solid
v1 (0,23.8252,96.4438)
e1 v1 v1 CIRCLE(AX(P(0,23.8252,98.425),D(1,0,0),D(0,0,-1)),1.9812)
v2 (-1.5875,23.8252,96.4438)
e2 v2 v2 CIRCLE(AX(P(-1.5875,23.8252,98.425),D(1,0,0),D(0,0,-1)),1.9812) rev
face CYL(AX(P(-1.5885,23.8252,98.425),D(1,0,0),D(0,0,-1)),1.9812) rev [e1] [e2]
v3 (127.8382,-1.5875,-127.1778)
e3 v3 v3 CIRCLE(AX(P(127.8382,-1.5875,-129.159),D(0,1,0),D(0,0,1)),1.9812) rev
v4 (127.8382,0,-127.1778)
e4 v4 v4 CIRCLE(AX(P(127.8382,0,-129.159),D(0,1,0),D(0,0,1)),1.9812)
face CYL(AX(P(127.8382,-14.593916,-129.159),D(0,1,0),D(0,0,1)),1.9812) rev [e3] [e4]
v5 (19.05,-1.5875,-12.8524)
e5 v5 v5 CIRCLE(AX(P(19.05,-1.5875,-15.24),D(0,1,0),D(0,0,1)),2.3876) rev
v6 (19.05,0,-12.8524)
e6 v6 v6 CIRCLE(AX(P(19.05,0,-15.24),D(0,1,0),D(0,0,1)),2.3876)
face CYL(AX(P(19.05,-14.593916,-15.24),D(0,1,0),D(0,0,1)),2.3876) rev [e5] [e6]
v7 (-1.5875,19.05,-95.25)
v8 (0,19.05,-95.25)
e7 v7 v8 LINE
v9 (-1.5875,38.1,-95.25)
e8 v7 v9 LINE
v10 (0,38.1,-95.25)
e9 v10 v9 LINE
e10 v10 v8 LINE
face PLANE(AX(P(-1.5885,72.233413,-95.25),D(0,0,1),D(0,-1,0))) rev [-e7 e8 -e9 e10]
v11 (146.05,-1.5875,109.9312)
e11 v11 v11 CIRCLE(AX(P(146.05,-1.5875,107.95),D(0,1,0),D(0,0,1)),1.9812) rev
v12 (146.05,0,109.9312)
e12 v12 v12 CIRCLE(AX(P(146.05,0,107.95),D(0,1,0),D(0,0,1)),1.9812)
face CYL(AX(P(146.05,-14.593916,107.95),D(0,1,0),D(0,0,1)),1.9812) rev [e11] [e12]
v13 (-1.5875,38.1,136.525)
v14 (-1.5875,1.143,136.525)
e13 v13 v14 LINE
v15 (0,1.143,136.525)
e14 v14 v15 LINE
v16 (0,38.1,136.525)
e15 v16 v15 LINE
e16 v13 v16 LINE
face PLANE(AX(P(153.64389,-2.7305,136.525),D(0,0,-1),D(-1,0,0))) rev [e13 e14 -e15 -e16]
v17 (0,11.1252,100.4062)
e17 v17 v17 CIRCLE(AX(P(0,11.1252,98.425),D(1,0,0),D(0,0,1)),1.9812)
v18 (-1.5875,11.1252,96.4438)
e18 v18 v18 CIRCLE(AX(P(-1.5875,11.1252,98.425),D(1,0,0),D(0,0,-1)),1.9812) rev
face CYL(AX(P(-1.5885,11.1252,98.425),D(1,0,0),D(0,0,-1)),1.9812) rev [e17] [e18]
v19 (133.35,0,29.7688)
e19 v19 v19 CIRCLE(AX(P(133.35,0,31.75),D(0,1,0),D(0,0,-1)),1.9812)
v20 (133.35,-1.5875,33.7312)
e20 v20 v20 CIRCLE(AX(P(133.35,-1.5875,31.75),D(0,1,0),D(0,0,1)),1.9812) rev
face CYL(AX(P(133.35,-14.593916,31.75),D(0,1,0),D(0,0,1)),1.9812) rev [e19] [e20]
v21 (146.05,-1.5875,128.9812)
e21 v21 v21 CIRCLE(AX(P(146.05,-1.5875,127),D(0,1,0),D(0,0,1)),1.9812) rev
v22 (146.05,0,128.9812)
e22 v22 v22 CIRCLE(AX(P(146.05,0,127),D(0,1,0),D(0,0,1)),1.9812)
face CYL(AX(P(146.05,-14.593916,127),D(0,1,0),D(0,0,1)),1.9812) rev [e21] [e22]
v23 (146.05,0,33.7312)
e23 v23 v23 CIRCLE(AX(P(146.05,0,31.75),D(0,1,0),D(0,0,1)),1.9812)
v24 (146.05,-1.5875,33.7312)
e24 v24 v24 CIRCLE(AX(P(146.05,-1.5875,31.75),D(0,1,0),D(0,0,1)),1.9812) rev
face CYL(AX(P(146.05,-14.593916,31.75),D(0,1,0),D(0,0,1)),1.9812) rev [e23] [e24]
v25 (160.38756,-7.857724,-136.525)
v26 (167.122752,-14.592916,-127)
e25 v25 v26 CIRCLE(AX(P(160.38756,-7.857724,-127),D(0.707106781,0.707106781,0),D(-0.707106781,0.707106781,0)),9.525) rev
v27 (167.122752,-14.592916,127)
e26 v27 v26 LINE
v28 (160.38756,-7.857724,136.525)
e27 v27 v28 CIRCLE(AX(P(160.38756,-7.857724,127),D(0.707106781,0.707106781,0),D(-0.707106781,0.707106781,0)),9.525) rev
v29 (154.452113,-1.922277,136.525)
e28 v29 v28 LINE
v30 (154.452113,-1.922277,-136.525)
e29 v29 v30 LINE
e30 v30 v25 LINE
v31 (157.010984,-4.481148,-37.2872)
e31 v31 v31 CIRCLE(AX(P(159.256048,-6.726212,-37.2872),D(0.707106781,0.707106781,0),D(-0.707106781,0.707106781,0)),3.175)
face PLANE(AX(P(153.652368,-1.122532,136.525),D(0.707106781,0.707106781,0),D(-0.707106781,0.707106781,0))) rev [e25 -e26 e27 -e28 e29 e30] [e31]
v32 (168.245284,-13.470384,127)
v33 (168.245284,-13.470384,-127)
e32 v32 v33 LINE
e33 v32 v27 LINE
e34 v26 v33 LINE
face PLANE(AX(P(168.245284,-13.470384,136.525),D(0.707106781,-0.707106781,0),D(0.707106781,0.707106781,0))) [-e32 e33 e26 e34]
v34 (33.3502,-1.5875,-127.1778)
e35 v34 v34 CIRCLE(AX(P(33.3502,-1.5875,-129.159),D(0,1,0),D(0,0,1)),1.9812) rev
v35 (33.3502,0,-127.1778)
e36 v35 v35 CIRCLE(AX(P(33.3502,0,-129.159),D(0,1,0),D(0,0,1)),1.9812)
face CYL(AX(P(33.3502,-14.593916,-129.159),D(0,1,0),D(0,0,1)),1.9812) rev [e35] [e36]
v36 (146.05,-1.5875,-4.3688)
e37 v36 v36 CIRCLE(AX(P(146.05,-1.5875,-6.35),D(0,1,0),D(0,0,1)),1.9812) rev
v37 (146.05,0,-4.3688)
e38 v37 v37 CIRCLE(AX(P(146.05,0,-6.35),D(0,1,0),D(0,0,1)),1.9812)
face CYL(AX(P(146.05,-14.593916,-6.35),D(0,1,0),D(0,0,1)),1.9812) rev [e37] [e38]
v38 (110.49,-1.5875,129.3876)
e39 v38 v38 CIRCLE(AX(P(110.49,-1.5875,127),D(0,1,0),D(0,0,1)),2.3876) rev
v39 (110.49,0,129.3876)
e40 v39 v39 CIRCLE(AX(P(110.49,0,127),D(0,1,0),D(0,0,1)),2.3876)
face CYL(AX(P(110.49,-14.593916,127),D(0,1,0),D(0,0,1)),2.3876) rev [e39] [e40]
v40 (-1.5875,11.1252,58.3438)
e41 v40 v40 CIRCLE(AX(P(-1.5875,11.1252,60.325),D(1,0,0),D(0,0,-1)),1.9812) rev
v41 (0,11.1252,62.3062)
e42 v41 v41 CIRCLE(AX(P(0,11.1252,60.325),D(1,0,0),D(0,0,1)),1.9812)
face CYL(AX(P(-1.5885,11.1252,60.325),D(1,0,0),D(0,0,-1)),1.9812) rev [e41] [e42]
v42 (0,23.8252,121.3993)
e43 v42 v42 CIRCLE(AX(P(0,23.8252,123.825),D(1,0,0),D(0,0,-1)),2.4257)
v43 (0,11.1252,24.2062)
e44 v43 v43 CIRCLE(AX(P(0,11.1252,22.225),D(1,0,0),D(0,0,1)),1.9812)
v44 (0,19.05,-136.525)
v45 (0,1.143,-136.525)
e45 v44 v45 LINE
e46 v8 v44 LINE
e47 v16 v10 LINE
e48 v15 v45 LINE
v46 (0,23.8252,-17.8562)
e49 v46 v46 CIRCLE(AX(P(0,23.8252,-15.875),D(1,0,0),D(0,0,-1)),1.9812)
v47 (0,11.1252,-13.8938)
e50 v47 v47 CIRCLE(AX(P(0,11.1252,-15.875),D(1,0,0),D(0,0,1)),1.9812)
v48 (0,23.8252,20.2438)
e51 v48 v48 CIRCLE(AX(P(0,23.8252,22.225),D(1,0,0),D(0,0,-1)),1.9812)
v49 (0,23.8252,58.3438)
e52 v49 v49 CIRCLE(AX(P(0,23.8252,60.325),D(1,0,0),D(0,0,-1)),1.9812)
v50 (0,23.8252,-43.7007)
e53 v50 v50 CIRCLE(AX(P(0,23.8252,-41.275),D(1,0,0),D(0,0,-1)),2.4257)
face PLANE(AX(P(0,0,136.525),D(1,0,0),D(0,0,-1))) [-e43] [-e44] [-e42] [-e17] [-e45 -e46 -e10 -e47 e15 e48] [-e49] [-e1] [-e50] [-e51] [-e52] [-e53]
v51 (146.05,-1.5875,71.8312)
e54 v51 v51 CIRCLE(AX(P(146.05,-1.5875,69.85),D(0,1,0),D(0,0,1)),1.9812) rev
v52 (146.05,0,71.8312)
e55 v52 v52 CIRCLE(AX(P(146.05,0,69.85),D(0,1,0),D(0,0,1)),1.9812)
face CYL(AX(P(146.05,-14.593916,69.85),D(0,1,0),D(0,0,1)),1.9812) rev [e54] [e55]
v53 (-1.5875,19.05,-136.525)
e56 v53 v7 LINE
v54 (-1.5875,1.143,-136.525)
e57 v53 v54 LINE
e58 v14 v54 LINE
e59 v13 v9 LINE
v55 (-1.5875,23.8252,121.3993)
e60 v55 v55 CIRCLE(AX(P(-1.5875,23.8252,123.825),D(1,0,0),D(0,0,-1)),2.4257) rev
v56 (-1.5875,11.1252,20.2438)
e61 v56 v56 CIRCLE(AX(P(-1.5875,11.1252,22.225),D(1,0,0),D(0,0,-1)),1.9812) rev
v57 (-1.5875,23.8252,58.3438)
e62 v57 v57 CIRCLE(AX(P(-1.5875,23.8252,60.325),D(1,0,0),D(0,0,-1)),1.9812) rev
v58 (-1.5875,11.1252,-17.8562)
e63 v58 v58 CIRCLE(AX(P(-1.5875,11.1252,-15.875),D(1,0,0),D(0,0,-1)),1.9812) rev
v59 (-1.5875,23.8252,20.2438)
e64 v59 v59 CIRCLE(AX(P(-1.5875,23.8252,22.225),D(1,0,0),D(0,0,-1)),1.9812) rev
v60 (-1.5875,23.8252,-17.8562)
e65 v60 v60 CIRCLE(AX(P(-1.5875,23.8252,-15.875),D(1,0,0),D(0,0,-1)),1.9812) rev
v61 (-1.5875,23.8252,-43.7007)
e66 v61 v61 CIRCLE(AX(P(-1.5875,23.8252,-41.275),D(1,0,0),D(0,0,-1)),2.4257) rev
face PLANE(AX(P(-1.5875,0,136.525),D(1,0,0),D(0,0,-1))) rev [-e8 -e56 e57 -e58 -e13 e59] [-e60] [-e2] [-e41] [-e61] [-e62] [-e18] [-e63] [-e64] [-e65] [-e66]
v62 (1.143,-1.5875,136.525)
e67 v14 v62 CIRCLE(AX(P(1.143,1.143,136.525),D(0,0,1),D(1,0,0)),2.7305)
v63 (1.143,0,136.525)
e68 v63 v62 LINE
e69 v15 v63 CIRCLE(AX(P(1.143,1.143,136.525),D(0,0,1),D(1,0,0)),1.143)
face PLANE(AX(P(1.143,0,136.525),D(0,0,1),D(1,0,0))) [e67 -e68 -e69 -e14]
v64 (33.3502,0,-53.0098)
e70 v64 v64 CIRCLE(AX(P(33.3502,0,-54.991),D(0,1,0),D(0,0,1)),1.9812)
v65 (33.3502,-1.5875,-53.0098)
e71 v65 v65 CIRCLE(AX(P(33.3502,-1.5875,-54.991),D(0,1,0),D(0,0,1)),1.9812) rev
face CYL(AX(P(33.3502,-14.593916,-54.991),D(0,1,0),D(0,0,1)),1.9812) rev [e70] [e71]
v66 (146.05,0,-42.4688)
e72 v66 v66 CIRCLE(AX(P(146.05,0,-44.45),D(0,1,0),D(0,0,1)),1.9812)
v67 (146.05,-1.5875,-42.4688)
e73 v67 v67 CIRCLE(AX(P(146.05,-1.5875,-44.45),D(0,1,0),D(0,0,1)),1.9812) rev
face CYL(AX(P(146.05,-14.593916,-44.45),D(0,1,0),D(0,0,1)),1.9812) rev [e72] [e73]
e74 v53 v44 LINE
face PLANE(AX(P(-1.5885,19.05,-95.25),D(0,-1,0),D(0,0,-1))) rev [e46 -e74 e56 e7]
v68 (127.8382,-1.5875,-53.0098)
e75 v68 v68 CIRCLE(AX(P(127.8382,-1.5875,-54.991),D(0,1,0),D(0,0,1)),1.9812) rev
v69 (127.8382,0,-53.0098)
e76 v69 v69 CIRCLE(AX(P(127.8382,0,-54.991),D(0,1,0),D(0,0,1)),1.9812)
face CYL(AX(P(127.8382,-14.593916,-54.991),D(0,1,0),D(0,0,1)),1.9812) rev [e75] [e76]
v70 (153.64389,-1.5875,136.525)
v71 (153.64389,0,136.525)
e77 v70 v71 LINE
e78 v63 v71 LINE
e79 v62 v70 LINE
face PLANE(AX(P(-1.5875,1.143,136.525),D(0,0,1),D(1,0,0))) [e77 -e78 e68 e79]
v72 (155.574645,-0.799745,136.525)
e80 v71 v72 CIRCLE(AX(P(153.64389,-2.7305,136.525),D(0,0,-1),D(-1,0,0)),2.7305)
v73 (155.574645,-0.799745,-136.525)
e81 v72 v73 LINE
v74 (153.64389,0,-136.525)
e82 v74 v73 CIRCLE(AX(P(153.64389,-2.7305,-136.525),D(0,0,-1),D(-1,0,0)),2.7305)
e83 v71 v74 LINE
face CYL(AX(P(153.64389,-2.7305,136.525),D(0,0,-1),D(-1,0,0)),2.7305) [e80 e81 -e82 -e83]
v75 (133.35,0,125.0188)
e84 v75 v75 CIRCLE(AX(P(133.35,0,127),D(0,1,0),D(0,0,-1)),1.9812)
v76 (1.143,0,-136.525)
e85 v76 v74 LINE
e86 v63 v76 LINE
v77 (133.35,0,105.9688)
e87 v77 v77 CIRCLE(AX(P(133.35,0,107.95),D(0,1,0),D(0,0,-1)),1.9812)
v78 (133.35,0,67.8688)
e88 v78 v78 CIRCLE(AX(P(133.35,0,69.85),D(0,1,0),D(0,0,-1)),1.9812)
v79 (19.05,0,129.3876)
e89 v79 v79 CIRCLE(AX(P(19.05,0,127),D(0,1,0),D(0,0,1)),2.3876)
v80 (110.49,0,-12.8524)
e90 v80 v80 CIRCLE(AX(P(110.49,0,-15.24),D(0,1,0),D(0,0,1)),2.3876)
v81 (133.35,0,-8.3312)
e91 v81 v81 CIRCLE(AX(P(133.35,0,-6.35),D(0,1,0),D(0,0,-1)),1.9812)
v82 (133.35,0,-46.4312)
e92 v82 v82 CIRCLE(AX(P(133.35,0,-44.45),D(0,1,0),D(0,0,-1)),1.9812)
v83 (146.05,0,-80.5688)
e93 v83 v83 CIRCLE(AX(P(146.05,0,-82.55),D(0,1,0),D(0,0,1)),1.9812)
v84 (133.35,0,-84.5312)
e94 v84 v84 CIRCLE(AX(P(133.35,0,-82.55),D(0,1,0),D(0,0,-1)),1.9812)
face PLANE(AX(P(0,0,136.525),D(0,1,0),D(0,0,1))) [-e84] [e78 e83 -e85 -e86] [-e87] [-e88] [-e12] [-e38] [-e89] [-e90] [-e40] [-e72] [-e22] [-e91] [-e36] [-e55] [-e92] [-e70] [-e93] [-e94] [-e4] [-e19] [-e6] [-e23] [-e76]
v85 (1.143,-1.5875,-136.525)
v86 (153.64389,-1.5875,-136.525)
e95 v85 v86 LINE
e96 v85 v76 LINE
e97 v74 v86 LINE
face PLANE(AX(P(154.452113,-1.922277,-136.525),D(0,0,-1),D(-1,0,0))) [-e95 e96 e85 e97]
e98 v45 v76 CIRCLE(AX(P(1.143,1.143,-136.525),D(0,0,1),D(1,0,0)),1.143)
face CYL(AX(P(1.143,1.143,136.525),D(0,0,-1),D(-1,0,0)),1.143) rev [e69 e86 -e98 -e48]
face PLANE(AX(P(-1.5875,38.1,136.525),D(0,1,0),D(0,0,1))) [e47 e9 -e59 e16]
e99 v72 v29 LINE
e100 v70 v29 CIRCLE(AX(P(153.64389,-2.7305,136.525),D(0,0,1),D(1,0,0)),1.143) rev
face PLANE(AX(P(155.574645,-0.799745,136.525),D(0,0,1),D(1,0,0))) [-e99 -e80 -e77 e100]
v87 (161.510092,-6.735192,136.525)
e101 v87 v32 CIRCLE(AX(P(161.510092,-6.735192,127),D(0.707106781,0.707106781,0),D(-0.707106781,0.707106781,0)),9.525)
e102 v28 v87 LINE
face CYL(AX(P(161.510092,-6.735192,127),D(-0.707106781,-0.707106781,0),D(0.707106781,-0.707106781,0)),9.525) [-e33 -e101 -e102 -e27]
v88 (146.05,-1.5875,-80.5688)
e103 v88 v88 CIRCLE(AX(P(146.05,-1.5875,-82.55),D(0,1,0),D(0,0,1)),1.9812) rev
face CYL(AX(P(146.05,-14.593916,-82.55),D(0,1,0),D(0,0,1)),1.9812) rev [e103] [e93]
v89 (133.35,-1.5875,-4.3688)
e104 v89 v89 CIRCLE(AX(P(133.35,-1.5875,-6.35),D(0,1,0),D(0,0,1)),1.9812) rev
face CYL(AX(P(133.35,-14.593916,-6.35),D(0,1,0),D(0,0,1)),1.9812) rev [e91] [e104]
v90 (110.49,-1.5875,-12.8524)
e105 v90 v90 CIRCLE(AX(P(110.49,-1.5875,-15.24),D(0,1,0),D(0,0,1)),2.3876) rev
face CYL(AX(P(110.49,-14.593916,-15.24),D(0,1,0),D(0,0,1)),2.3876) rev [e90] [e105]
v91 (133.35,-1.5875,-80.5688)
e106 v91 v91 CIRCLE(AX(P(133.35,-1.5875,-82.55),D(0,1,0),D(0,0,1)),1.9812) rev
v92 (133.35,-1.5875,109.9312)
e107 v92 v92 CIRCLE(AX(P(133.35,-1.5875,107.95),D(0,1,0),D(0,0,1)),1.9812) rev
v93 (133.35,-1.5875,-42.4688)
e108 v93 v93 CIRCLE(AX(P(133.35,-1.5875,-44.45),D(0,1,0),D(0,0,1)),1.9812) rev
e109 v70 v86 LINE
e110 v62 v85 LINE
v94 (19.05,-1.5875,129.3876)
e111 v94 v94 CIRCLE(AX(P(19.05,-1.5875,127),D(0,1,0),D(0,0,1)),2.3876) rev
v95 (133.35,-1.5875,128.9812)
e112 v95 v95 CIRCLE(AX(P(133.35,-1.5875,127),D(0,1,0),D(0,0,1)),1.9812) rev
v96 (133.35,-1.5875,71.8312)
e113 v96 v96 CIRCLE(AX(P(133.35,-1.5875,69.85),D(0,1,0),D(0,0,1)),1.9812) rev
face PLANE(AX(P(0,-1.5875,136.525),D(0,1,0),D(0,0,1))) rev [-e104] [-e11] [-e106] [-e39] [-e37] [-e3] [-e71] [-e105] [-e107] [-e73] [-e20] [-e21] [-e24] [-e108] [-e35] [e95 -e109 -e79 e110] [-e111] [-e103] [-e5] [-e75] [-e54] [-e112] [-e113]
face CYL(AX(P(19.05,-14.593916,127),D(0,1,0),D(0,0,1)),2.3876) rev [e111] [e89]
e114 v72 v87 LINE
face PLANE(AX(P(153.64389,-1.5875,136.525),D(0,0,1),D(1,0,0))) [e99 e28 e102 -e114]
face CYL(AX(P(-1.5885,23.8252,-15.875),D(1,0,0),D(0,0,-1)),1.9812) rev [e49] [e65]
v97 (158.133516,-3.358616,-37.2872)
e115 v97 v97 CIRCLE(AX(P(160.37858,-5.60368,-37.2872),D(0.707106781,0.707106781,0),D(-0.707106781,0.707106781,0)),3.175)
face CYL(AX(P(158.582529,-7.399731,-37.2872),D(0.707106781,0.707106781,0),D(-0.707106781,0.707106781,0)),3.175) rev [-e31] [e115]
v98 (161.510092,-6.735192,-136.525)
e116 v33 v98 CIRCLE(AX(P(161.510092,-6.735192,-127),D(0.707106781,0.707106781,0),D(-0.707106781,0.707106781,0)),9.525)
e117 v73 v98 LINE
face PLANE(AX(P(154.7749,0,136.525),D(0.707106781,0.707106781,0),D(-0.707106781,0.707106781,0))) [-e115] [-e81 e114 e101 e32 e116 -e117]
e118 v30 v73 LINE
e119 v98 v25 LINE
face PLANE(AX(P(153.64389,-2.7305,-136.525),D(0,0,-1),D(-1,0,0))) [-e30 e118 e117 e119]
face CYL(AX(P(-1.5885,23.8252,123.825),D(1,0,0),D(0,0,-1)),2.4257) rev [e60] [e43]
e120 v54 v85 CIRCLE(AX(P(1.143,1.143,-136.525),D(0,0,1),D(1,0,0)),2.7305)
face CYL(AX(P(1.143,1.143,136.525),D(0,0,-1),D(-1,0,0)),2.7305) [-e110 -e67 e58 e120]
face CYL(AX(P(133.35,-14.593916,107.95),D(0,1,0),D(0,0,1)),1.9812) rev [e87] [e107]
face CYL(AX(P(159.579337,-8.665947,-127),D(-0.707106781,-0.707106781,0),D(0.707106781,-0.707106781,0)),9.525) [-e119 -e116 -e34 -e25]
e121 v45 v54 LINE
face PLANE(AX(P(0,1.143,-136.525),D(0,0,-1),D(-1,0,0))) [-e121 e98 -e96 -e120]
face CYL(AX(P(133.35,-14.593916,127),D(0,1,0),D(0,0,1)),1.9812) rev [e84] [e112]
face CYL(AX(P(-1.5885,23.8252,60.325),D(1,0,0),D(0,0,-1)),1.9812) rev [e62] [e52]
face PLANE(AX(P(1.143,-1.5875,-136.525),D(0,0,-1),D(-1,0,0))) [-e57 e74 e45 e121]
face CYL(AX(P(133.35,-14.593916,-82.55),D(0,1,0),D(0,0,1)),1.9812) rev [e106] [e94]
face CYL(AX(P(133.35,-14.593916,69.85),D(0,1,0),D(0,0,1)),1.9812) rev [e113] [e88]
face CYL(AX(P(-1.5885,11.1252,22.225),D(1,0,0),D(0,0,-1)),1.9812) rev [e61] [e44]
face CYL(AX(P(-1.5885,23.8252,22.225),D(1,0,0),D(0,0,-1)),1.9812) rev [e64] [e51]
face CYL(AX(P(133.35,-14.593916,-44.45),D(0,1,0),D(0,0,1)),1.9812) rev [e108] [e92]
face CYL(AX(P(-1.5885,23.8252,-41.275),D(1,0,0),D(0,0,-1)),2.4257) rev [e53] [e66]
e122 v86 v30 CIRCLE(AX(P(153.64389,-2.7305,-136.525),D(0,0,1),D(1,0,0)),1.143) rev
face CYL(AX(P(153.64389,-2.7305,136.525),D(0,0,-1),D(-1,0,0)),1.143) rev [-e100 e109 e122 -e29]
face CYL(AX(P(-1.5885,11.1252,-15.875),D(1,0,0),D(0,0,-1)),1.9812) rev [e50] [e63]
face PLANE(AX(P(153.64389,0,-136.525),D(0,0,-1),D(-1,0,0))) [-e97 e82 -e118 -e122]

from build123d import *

# Parameters (mm, degrees)
BASE_FLANGE1_DEPTH              = 136.525
CE_00_FEED_CONTROL_REACH        = 221.994
SKETCH8_R                       = 2.3876
CE_00_CRYO_CONTROL_REACH        = 221.994
SKETCH9_R                       = 1.9812
CE_00_HOLE_MOUNT_FLANGE_REACH   = 221.994
SKETCH10_R                      = 2.4257
SKETCH12_R                      = 3.175
CE_00_HOLE_MOUNT_TOP_DEPTH      = 2.54
CE_00_HOLE_EXTRA_ON_PANEL_REACH = 221.994
SKETCH11_R                      = 1.9812
CE_00_NOTCH_REACH               = 221.994
SKETCH13_W                      = 51.292163309
SKETCH13_H                      = 53.183412621
FILLET1_R                       = 9.525
CUT_EXTRUDE1_REACH              = 221.994
SKETCH14_R                      = 1.9812


# Sheet-metal steps are written as plain solids
with BuildPart() as part:
    # Sketch3 → Base-Flange1 (new, symmetric)
    with BuildSketch(Plane.XY):
        with BuildLine():
            Line((0, 38.1), (0, 1.143))
            ThreePointArc((0, 1.143), (0.334776949, 0.334776949), (1.143, 0))
            Line((1.143, 0), (153.643889868, 0))
            ThreePointArc((153.643889868, 0), (154.68880698, -0.207846936), (155.574644934, -0.799744934))
            Line((155.574644934, -0.799744934), (168.245284182, -13.470384182))
            Line((168.245284182, -13.470384182), (167.122752166, -14.592916197))
            Line((167.122752166, -14.592916197), (154.452112919, -1.922276949))
            ThreePointArc((154.452112919, -1.922276949), (154.081297031, -1.674505694), (153.643889868, -1.5875))
            Line((153.643889868, -1.5875), (1.143, -1.5875))
            ThreePointArc((1.143, -1.5875), (-0.787755066, -0.787755066), (-1.5875, 1.143))
            Line((-1.5875, 1.143), (-1.5875, 38.1))
            Line((-1.5875, 38.1), (0, 38.1))
        make_face()
    extrude(amount=BASE_FLANGE1_DEPTH, both=True)

    # Sketch8 → CE-00 Feed Control (cut, up to next)
    with BuildSketch(Plane(origin=(0, 0, 0), x_dir=(1, 0, 0), z_dir=(0, 1, 0)), mode=Mode.PRIVATE) as ce_00_feed_control_sk1:
        with Locations(Location((19.05, 15.24, 0), (0, 0, 270))):
            Circle(SKETCH8_R)
    ce_00_feed_control_tool1 = extrude(ce_00_feed_control_sk1.sketch, amount=-CE_00_FEED_CONTROL_REACH, mode=Mode.PRIVATE) & part.part
    # Sketch8 → CE-00 Feed Control (cut, up to next)
    with BuildSketch(Plane(origin=(0, 0, 0), x_dir=(1, 0, 0), z_dir=(0, 1, 0)), mode=Mode.PRIVATE) as ce_00_feed_control_sk2:
        with Locations(Location((19.05, -127, 0), (0, 0, 270))):
            Circle(SKETCH8_R)
    ce_00_feed_control_tool2 = extrude(ce_00_feed_control_sk2.sketch, amount=-CE_00_FEED_CONTROL_REACH, mode=Mode.PRIVATE) & part.part
    # Sketch8 → CE-00 Feed Control (cut, up to next)
    with BuildSketch(Plane(origin=(0, 0, 0), x_dir=(1, 0, 0), z_dir=(0, 1, 0)), mode=Mode.PRIVATE) as ce_00_feed_control_sk3:
        with Locations(Location((110.49, -127, 0), (0, 0, 270))):
            Circle(SKETCH8_R)
    ce_00_feed_control_tool3 = extrude(ce_00_feed_control_sk3.sketch, amount=-CE_00_FEED_CONTROL_REACH, mode=Mode.PRIVATE) & part.part
    # Sketch8 → CE-00 Feed Control (cut, up to next)
    with BuildSketch(Plane(origin=(0, 0, 0), x_dir=(1, 0, 0), z_dir=(0, 1, 0)), mode=Mode.PRIVATE) as ce_00_feed_control_sk4:
        with Locations(Location((110.49, 15.24, 0), (0, 0, 270))):
            Circle(SKETCH8_R)
    ce_00_feed_control_tool4 = extrude(ce_00_feed_control_sk4.sketch, amount=-CE_00_FEED_CONTROL_REACH, mode=Mode.PRIVATE) & part.part
    add(ce_00_feed_control_tool1.solids().sort_by_distance((19.05, 0, -15.24))[0], mode=Mode.SUBTRACT)
    add(ce_00_feed_control_tool2.solids().sort_by_distance((19.05, 0, 127))[0], mode=Mode.SUBTRACT)
    add(ce_00_feed_control_tool3.solids().sort_by_distance((110.49, 0, 127))[0], mode=Mode.SUBTRACT)
    add(ce_00_feed_control_tool4.solids().sort_by_distance((110.49, 0, -15.24))[0], mode=Mode.SUBTRACT)

    # Sketch9 → CE-00 Cryo Control (cut, up to next)
    with BuildSketch(Plane(origin=(0, 0, 0), x_dir=(1, 0, 0), z_dir=(0, 1, 0)), mode=Mode.PRIVATE) as ce_00_cryo_control_sk1:
        with Locations(Location((127.8382, 129.159, 0), (0, 0, 270))):
            Circle(SKETCH9_R)
    ce_00_cryo_control_tool1 = extrude(ce_00_cryo_control_sk1.sketch, amount=-CE_00_CRYO_CONTROL_REACH, mode=Mode.PRIVATE) & part.part
    # Sketch9 → CE-00 Cryo Control (cut, up to next)
    with BuildSketch(Plane(origin=(0, 0, 0), x_dir=(1, 0, 0), z_dir=(0, 1, 0)), mode=Mode.PRIVATE) as ce_00_cryo_control_sk2:
        with Locations(Location((33.3502, 129.159, 0), (0, 0, 270))):
            Circle(SKETCH9_R)
    ce_00_cryo_control_tool2 = extrude(ce_00_cryo_control_sk2.sketch, amount=-CE_00_CRYO_CONTROL_REACH, mode=Mode.PRIVATE) & part.part
    # Sketch9 → CE-00 Cryo Control (cut, up to next)
    with BuildSketch(Plane(origin=(0, 0, 0), x_dir=(1, 0, 0), z_dir=(0, 1, 0)), mode=Mode.PRIVATE) as ce_00_cryo_control_sk3:
        with Locations(Location((33.3502, 54.991, 0), (0, 0, 270))):
            Circle(SKETCH9_R)
    ce_00_cryo_control_tool3 = extrude(ce_00_cryo_control_sk3.sketch, amount=-CE_00_CRYO_CONTROL_REACH, mode=Mode.PRIVATE) & part.part
    # Sketch9 → CE-00 Cryo Control (cut, up to next)
    with BuildSketch(Plane(origin=(0, 0, 0), x_dir=(1, 0, 0), z_dir=(0, 1, 0)), mode=Mode.PRIVATE) as ce_00_cryo_control_sk4:
        with Locations(Location((127.8382, 54.991, 0), (0, 0, 270))):
            Circle(SKETCH9_R)
    ce_00_cryo_control_tool4 = extrude(ce_00_cryo_control_sk4.sketch, amount=-CE_00_CRYO_CONTROL_REACH, mode=Mode.PRIVATE) & part.part
    add(ce_00_cryo_control_tool1.solids().sort_by_distance((127.8382, 0, -129.159))[0], mode=Mode.SUBTRACT)
    add(ce_00_cryo_control_tool2.solids().sort_by_distance((33.3502, 0, -129.159))[0], mode=Mode.SUBTRACT)
    add(ce_00_cryo_control_tool3.solids().sort_by_distance((33.3502, 0, -54.991))[0], mode=Mode.SUBTRACT)
    add(ce_00_cryo_control_tool4.solids().sort_by_distance((127.8382, 0, -54.991))[0], mode=Mode.SUBTRACT)

    # Sketch10 → CE-00 Hole Mount Flange (cut, up to next)
    with BuildSketch(Plane(origin=(0, 0, 0), x_dir=(0, 0, -1), z_dir=(1, 0, 0)), mode=Mode.PRIVATE) as ce_00_hole_mount_flange_sk1:
        with Locations((-123.825, 23.8252)):
            Circle(SKETCH10_R)
    ce_00_hole_mount_flange_tool1 = extrude(ce_00_hole_mount_flange_sk1.sketch, amount=-CE_00_HOLE_MOUNT_FLANGE_REACH, mode=Mode.PRIVATE) & part.part
    # Sketch10 → CE-00 Hole Mount Flange (cut, up to next)
    with BuildSketch(Plane(origin=(0, 0, 0), x_dir=(0, 0, -1), z_dir=(1, 0, 0)), mode=Mode.PRIVATE) as ce_00_hole_mount_flange_sk2:
        with Locations((41.275, 23.8252)):
            Circle(SKETCH10_R)
    ce_00_hole_mount_flange_tool2 = extrude(ce_00_hole_mount_flange_sk2.sketch, amount=-CE_00_HOLE_MOUNT_FLANGE_REACH, mode=Mode.PRIVATE) & part.part
    add(ce_00_hole_mount_flange_tool1.solids().sort_by_distance((0, 23.8252, 123.825))[0], mode=Mode.SUBTRACT)
    add(ce_00_hole_mount_flange_tool2.solids().sort_by_distance((0, 23.8252, -41.275))[0], mode=Mode.SUBTRACT)

    # Sketch12 → CE-00 Hole Mount Top (cut)
    with BuildSketch(Plane(origin=(77.38745, 77.38745, 0), x_dir=(0, 0, -1), z_dir=(0.7071067811865487, 0.7071067811865465, 0))):
        with Locations(Location((37.2872, -117.367181347, 0), (0, 0, 90))):
            Circle(SKETCH12_R)
    extrude(amount=-CE_00_HOLE_MOUNT_TOP_DEPTH, mode=Mode.SUBTRACT)

    # Sketch11 → CE-00 Hole Extra on Panel (cut, up to next)
    with BuildSketch(Plane(origin=(0, 0, 0), x_dir=(1, 0, 0), z_dir=(0, 1, 0)), mode=Mode.PRIVATE) as ce_00_hole_extra_on_panel_sk1:
        with Locations(Location((146.05, -127, 0), (0, 0, 270))):
            Circle(SKETCH11_R)
    ce_00_hole_extra_on_panel_tool1 = extrude(ce_00_hole_extra_on_panel_sk1.sketch, amount=-CE_00_HOLE_EXTRA_ON_PANEL_REACH, mode=Mode.PRIVATE) & part.part
    # Sketch11 → CE-00 Hole Extra on Panel (cut, up to next)
    with BuildSketch(Plane(origin=(0, 0, 0), x_dir=(1, 0, 0), z_dir=(0, 1, 0)), mode=Mode.PRIVATE) as ce_00_hole_extra_on_panel_sk2:
        with Locations(Location((146.05, -107.95, 0), (0, 0, 270))):
            Circle(SKETCH11_R)
    ce_00_hole_extra_on_panel_tool2 = extrude(ce_00_hole_extra_on_panel_sk2.sketch, amount=-CE_00_HOLE_EXTRA_ON_PANEL_REACH, mode=Mode.PRIVATE) & part.part
    # Sketch11 → CE-00 Hole Extra on Panel (cut, up to next)
    with BuildSketch(Plane(origin=(0, 0, 0), x_dir=(1, 0, 0), z_dir=(0, 1, 0)), mode=Mode.PRIVATE) as ce_00_hole_extra_on_panel_sk3:
        with Locations(Location((146.05, -69.85, 0), (0, 0, 270))):
            Circle(SKETCH11_R)
    ce_00_hole_extra_on_panel_tool3 = extrude(ce_00_hole_extra_on_panel_sk3.sketch, amount=-CE_00_HOLE_EXTRA_ON_PANEL_REACH, mode=Mode.PRIVATE) & part.part
    # Sketch11 → CE-00 Hole Extra on Panel (cut, up to next)
    with BuildSketch(Plane(origin=(0, 0, 0), x_dir=(1, 0, 0), z_dir=(0, 1, 0)), mode=Mode.PRIVATE) as ce_00_hole_extra_on_panel_sk4:
        with Locations(Location((146.05, -31.75, 0), (0, 0, 270))):
            Circle(SKETCH11_R)
    ce_00_hole_extra_on_panel_tool4 = extrude(ce_00_hole_extra_on_panel_sk4.sketch, amount=-CE_00_HOLE_EXTRA_ON_PANEL_REACH, mode=Mode.PRIVATE) & part.part
    # Sketch11 → CE-00 Hole Extra on Panel (cut, up to next)
    with BuildSketch(Plane(origin=(0, 0, 0), x_dir=(1, 0, 0), z_dir=(0, 1, 0)), mode=Mode.PRIVATE) as ce_00_hole_extra_on_panel_sk5:
        with Locations(Location((146.05, 44.45, 0), (0, 0, 270))):
            Circle(SKETCH11_R)
    ce_00_hole_extra_on_panel_tool5 = extrude(ce_00_hole_extra_on_panel_sk5.sketch, amount=-CE_00_HOLE_EXTRA_ON_PANEL_REACH, mode=Mode.PRIVATE) & part.part
    # Sketch11 → CE-00 Hole Extra on Panel (cut, up to next)
    with BuildSketch(Plane(origin=(0, 0, 0), x_dir=(1, 0, 0), z_dir=(0, 1, 0)), mode=Mode.PRIVATE) as ce_00_hole_extra_on_panel_sk6:
        with Locations(Location((146.05, 82.55, 0), (0, 0, 270))):
            Circle(SKETCH11_R)
    ce_00_hole_extra_on_panel_tool6 = extrude(ce_00_hole_extra_on_panel_sk6.sketch, amount=-CE_00_HOLE_EXTRA_ON_PANEL_REACH, mode=Mode.PRIVATE) & part.part
    # Sketch11 → CE-00 Hole Extra on Panel (cut, up to next)
    with BuildSketch(Plane(origin=(0, 0, 0), x_dir=(1, 0, 0), z_dir=(0, 1, 0)), mode=Mode.PRIVATE) as ce_00_hole_extra_on_panel_sk7:
        with Locations(Location((146.05, 6.35, 0), (0, 0, 270))):
            Circle(SKETCH11_R)
    ce_00_hole_extra_on_panel_tool7 = extrude(ce_00_hole_extra_on_panel_sk7.sketch, amount=-CE_00_HOLE_EXTRA_ON_PANEL_REACH, mode=Mode.PRIVATE) & part.part
    # Sketch11 → CE-00 Hole Extra on Panel (cut, up to next)
    with BuildSketch(Plane(origin=(0, 0, 0), x_dir=(1, 0, 0), z_dir=(0, 1, 0)), mode=Mode.PRIVATE) as ce_00_hole_extra_on_panel_sk8:
        with Locations(Location((133.35, 6.35, 0), (0, 0, 270))):
            Circle(SKETCH11_R)
    ce_00_hole_extra_on_panel_tool8 = extrude(ce_00_hole_extra_on_panel_sk8.sketch, amount=-CE_00_HOLE_EXTRA_ON_PANEL_REACH, mode=Mode.PRIVATE) & part.part
    # Sketch11 → CE-00 Hole Extra on Panel (cut, up to next)
    with BuildSketch(Plane(origin=(0, 0, 0), x_dir=(1, 0, 0), z_dir=(0, 1, 0)), mode=Mode.PRIVATE) as ce_00_hole_extra_on_panel_sk9:
        with Locations(Location((133.35, -31.75, 0), (0, 0, 270))):
            Circle(SKETCH11_R)
    ce_00_hole_extra_on_panel_tool9 = extrude(ce_00_hole_extra_on_panel_sk9.sketch, amount=-CE_00_HOLE_EXTRA_ON_PANEL_REACH, mode=Mode.PRIVATE) & part.part
    # Sketch11 → CE-00 Hole Extra on Panel (cut, up to next)
    with BuildSketch(Plane(origin=(0, 0, 0), x_dir=(1, 0, 0), z_dir=(0, 1, 0)), mode=Mode.PRIVATE) as ce_00_hole_extra_on_panel_sk10:
        with Locations(Location((133.35, -69.85, 0), (0, 0, 270))):
            Circle(SKETCH11_R)
    ce_00_hole_extra_on_panel_tool10 = extrude(ce_00_hole_extra_on_panel_sk10.sketch, amount=-CE_00_HOLE_EXTRA_ON_PANEL_REACH, mode=Mode.PRIVATE) & part.part
    # Sketch11 → CE-00 Hole Extra on Panel (cut, up to next)
    with BuildSketch(Plane(origin=(0, 0, 0), x_dir=(1, 0, 0), z_dir=(0, 1, 0)), mode=Mode.PRIVATE) as ce_00_hole_extra_on_panel_sk11:
        with Locations(Location((133.35, -107.95, 0), (0, 0, 270))):
            Circle(SKETCH11_R)
    ce_00_hole_extra_on_panel_tool11 = extrude(ce_00_hole_extra_on_panel_sk11.sketch, amount=-CE_00_HOLE_EXTRA_ON_PANEL_REACH, mode=Mode.PRIVATE) & part.part
    # Sketch11 → CE-00 Hole Extra on Panel (cut, up to next)
    with BuildSketch(Plane(origin=(0, 0, 0), x_dir=(1, 0, 0), z_dir=(0, 1, 0)), mode=Mode.PRIVATE) as ce_00_hole_extra_on_panel_sk12:
        with Locations(Location((133.35, -127, 0), (0, 0, 270))):
            Circle(SKETCH11_R)
    ce_00_hole_extra_on_panel_tool12 = extrude(ce_00_hole_extra_on_panel_sk12.sketch, amount=-CE_00_HOLE_EXTRA_ON_PANEL_REACH, mode=Mode.PRIVATE) & part.part
    # Sketch11 → CE-00 Hole Extra on Panel (cut, up to next)
    with BuildSketch(Plane(origin=(0, 0, 0), x_dir=(1, 0, 0), z_dir=(0, 1, 0)), mode=Mode.PRIVATE) as ce_00_hole_extra_on_panel_sk13:
        with Locations(Location((133.35, 82.55, 0), (0, 0, 270))):
            Circle(SKETCH11_R)
    ce_00_hole_extra_on_panel_tool13 = extrude(ce_00_hole_extra_on_panel_sk13.sketch, amount=-CE_00_HOLE_EXTRA_ON_PANEL_REACH, mode=Mode.PRIVATE) & part.part
    # Sketch11 → CE-00 Hole Extra on Panel (cut, up to next)
    with BuildSketch(Plane(origin=(0, 0, 0), x_dir=(1, 0, 0), z_dir=(0, 1, 0)), mode=Mode.PRIVATE) as ce_00_hole_extra_on_panel_sk14:
        with Locations(Location((133.35, 44.45, 0), (0, 0, 270))):
            Circle(SKETCH11_R)
    ce_00_hole_extra_on_panel_tool14 = extrude(ce_00_hole_extra_on_panel_sk14.sketch, amount=-CE_00_HOLE_EXTRA_ON_PANEL_REACH, mode=Mode.PRIVATE) & part.part
    add(ce_00_hole_extra_on_panel_tool1.solids().sort_by_distance((146.05, 0, 127))[0], mode=Mode.SUBTRACT)
    add(ce_00_hole_extra_on_panel_tool2.solids().sort_by_distance((146.05, 0, 107.95))[0], mode=Mode.SUBTRACT)
    add(ce_00_hole_extra_on_panel_tool3.solids().sort_by_distance((146.05, 0, 69.85))[0], mode=Mode.SUBTRACT)
    add(ce_00_hole_extra_on_panel_tool4.solids().sort_by_distance((146.05, 0, 31.75))[0], mode=Mode.SUBTRACT)
    add(ce_00_hole_extra_on_panel_tool5.solids().sort_by_distance((146.05, 0, -44.45))[0], mode=Mode.SUBTRACT)
    add(ce_00_hole_extra_on_panel_tool6.solids().sort_by_distance((146.05, 0, -82.55))[0], mode=Mode.SUBTRACT)
    add(ce_00_hole_extra_on_panel_tool7.solids().sort_by_distance((146.05, 0, -6.35))[0], mode=Mode.SUBTRACT)
    add(ce_00_hole_extra_on_panel_tool8.solids().sort_by_distance((133.35, 0, -6.35))[0], mode=Mode.SUBTRACT)
    add(ce_00_hole_extra_on_panel_tool9.solids().sort_by_distance((133.35, 0, 31.75))[0], mode=Mode.SUBTRACT)
    add(ce_00_hole_extra_on_panel_tool10.solids().sort_by_distance((133.35, 0, 69.85))[0], mode=Mode.SUBTRACT)
    add(ce_00_hole_extra_on_panel_tool11.solids().sort_by_distance((133.35, 0, 107.95))[0], mode=Mode.SUBTRACT)
    add(ce_00_hole_extra_on_panel_tool12.solids().sort_by_distance((133.35, 0, 127))[0], mode=Mode.SUBTRACT)
    add(ce_00_hole_extra_on_panel_tool13.solids().sort_by_distance((133.35, 0, -82.55))[0], mode=Mode.SUBTRACT)
    add(ce_00_hole_extra_on_panel_tool14.solids().sort_by_distance((133.35, 0, -44.45))[0], mode=Mode.SUBTRACT)

    # Sketch13 → CE-00 Notch (cut, up to next)
    with BuildSketch(Plane(origin=(0, 0, 0), x_dir=(0, 0, -1), z_dir=(1, 0, 0)), mode=Mode.PRIVATE) as ce_00_notch_sk1:
        with Locations((120.896081655, 45.64170631)):
            Rectangle(SKETCH13_W, SKETCH13_H)
    ce_00_notch_tool1 = extrude(ce_00_notch_sk1.sketch, amount=-CE_00_NOTCH_REACH, mode=Mode.PRIVATE) & part.part
    add(ce_00_notch_tool1.solids().sort_by_distance((0, 45.641706, -120.896082))[0], mode=Mode.SUBTRACT)

    # Fillet1
    fillet1_edges = [part.edges().sort_by_distance(p)[0] for p in [
        (167.684018174, -14.031650189, -136.525),
        (167.684018174, -14.031650189, 136.525),
    ]]
    fillet(fillet1_edges, radius=FILLET1_R)

    # Sketch14 → Cut-Extrude1 (cut, up to next)
    with BuildSketch(Plane(origin=(0, 0, 0), x_dir=(0, 0, -1), z_dir=(1, 0, 0)), mode=Mode.PRIVATE) as cut_extrude1_sk1:
        with Locations((-98.425, 23.8252)):
            Circle(SKETCH14_R)
    cut_extrude1_tool1 = extrude(cut_extrude1_sk1.sketch, amount=-CUT_EXTRUDE1_REACH, mode=Mode.PRIVATE) & part.part
    # Sketch14 → Cut-Extrude1 (cut, up to next)
    with BuildSketch(Plane(origin=(0, 0, 0), x_dir=(0, 0, -1), z_dir=(1, 0, 0)), mode=Mode.PRIVATE) as cut_extrude1_sk2:
        with Locations((-60.325, 23.8252)):
            Circle(SKETCH14_R)
    cut_extrude1_tool2 = extrude(cut_extrude1_sk2.sketch, amount=-CUT_EXTRUDE1_REACH, mode=Mode.PRIVATE) & part.part
    # Sketch14 → Cut-Extrude1 (cut, up to next)
    with BuildSketch(Plane(origin=(0, 0, 0), x_dir=(0, 0, -1), z_dir=(1, 0, 0)), mode=Mode.PRIVATE) as cut_extrude1_sk3:
        with Locations((-22.225, 23.8252)):
            Circle(SKETCH14_R)
    cut_extrude1_tool3 = extrude(cut_extrude1_sk3.sketch, amount=-CUT_EXTRUDE1_REACH, mode=Mode.PRIVATE) & part.part
    # Sketch14 → Cut-Extrude1 (cut, up to next)
    with BuildSketch(Plane(origin=(0, 0, 0), x_dir=(0, 0, -1), z_dir=(1, 0, 0)), mode=Mode.PRIVATE) as cut_extrude1_sk4:
        with Locations((15.875, 23.8252)):
            Circle(SKETCH14_R)
    cut_extrude1_tool4 = extrude(cut_extrude1_sk4.sketch, amount=-CUT_EXTRUDE1_REACH, mode=Mode.PRIVATE) & part.part
    # Sketch14 → Cut-Extrude1 (cut, up to next)
    with BuildSketch(Plane(origin=(0, 0, 0), x_dir=(0, 0, -1), z_dir=(1, 0, 0)), mode=Mode.PRIVATE) as cut_extrude1_sk5:
        with Locations((15.875, 11.1252)):
            Circle(SKETCH14_R)
    cut_extrude1_tool5 = extrude(cut_extrude1_sk5.sketch, amount=-CUT_EXTRUDE1_REACH, mode=Mode.PRIVATE) & part.part
    # Sketch14 → Cut-Extrude1 (cut, up to next)
    with BuildSketch(Plane(origin=(0, 0, 0), x_dir=(0, 0, -1), z_dir=(1, 0, 0)), mode=Mode.PRIVATE) as cut_extrude1_sk6:
        with Locations((-22.225, 11.1252)):
            Circle(SKETCH14_R)
    cut_extrude1_tool6 = extrude(cut_extrude1_sk6.sketch, amount=-CUT_EXTRUDE1_REACH, mode=Mode.PRIVATE) & part.part
    # Sketch14 → Cut-Extrude1 (cut, up to next)
    with BuildSketch(Plane(origin=(0, 0, 0), x_dir=(0, 0, -1), z_dir=(1, 0, 0)), mode=Mode.PRIVATE) as cut_extrude1_sk7:
        with Locations((-60.325, 11.1252)):
            Circle(SKETCH14_R)
    cut_extrude1_tool7 = extrude(cut_extrude1_sk7.sketch, amount=-CUT_EXTRUDE1_REACH, mode=Mode.PRIVATE) & part.part
    # Sketch14 → Cut-Extrude1 (cut, up to next)
    with BuildSketch(Plane(origin=(0, 0, 0), x_dir=(0, 0, -1), z_dir=(1, 0, 0)), mode=Mode.PRIVATE) as cut_extrude1_sk8:
        with Locations((-98.425, 11.1252)):
            Circle(SKETCH14_R)
    cut_extrude1_tool8 = extrude(cut_extrude1_sk8.sketch, amount=-CUT_EXTRUDE1_REACH, mode=Mode.PRIVATE) & part.part
    add(cut_extrude1_tool1.solids().sort_by_distance((0, 23.8252, 98.425))[0], mode=Mode.SUBTRACT)
    add(cut_extrude1_tool2.solids().sort_by_distance((0, 23.8252, 60.325))[0], mode=Mode.SUBTRACT)
    add(cut_extrude1_tool3.solids().sort_by_distance((0, 23.8252, 22.225))[0], mode=Mode.SUBTRACT)
    add(cut_extrude1_tool4.solids().sort_by_distance((0, 23.8252, -15.875))[0], mode=Mode.SUBTRACT)
    add(cut_extrude1_tool5.solids().sort_by_distance((0, 11.1252, -15.875))[0], mode=Mode.SUBTRACT)
    add(cut_extrude1_tool6.solids().sort_by_distance((0, 11.1252, 22.225))[0], mode=Mode.SUBTRACT)
    add(cut_extrude1_tool7.solids().sort_by_distance((0, 11.1252, 60.325))[0], mode=Mode.SUBTRACT)
    add(cut_extrude1_tool8.solids().sort_by_distance((0, 11.1252, 98.425))[0], mode=Mode.SUBTRACT)


solid = part.part
